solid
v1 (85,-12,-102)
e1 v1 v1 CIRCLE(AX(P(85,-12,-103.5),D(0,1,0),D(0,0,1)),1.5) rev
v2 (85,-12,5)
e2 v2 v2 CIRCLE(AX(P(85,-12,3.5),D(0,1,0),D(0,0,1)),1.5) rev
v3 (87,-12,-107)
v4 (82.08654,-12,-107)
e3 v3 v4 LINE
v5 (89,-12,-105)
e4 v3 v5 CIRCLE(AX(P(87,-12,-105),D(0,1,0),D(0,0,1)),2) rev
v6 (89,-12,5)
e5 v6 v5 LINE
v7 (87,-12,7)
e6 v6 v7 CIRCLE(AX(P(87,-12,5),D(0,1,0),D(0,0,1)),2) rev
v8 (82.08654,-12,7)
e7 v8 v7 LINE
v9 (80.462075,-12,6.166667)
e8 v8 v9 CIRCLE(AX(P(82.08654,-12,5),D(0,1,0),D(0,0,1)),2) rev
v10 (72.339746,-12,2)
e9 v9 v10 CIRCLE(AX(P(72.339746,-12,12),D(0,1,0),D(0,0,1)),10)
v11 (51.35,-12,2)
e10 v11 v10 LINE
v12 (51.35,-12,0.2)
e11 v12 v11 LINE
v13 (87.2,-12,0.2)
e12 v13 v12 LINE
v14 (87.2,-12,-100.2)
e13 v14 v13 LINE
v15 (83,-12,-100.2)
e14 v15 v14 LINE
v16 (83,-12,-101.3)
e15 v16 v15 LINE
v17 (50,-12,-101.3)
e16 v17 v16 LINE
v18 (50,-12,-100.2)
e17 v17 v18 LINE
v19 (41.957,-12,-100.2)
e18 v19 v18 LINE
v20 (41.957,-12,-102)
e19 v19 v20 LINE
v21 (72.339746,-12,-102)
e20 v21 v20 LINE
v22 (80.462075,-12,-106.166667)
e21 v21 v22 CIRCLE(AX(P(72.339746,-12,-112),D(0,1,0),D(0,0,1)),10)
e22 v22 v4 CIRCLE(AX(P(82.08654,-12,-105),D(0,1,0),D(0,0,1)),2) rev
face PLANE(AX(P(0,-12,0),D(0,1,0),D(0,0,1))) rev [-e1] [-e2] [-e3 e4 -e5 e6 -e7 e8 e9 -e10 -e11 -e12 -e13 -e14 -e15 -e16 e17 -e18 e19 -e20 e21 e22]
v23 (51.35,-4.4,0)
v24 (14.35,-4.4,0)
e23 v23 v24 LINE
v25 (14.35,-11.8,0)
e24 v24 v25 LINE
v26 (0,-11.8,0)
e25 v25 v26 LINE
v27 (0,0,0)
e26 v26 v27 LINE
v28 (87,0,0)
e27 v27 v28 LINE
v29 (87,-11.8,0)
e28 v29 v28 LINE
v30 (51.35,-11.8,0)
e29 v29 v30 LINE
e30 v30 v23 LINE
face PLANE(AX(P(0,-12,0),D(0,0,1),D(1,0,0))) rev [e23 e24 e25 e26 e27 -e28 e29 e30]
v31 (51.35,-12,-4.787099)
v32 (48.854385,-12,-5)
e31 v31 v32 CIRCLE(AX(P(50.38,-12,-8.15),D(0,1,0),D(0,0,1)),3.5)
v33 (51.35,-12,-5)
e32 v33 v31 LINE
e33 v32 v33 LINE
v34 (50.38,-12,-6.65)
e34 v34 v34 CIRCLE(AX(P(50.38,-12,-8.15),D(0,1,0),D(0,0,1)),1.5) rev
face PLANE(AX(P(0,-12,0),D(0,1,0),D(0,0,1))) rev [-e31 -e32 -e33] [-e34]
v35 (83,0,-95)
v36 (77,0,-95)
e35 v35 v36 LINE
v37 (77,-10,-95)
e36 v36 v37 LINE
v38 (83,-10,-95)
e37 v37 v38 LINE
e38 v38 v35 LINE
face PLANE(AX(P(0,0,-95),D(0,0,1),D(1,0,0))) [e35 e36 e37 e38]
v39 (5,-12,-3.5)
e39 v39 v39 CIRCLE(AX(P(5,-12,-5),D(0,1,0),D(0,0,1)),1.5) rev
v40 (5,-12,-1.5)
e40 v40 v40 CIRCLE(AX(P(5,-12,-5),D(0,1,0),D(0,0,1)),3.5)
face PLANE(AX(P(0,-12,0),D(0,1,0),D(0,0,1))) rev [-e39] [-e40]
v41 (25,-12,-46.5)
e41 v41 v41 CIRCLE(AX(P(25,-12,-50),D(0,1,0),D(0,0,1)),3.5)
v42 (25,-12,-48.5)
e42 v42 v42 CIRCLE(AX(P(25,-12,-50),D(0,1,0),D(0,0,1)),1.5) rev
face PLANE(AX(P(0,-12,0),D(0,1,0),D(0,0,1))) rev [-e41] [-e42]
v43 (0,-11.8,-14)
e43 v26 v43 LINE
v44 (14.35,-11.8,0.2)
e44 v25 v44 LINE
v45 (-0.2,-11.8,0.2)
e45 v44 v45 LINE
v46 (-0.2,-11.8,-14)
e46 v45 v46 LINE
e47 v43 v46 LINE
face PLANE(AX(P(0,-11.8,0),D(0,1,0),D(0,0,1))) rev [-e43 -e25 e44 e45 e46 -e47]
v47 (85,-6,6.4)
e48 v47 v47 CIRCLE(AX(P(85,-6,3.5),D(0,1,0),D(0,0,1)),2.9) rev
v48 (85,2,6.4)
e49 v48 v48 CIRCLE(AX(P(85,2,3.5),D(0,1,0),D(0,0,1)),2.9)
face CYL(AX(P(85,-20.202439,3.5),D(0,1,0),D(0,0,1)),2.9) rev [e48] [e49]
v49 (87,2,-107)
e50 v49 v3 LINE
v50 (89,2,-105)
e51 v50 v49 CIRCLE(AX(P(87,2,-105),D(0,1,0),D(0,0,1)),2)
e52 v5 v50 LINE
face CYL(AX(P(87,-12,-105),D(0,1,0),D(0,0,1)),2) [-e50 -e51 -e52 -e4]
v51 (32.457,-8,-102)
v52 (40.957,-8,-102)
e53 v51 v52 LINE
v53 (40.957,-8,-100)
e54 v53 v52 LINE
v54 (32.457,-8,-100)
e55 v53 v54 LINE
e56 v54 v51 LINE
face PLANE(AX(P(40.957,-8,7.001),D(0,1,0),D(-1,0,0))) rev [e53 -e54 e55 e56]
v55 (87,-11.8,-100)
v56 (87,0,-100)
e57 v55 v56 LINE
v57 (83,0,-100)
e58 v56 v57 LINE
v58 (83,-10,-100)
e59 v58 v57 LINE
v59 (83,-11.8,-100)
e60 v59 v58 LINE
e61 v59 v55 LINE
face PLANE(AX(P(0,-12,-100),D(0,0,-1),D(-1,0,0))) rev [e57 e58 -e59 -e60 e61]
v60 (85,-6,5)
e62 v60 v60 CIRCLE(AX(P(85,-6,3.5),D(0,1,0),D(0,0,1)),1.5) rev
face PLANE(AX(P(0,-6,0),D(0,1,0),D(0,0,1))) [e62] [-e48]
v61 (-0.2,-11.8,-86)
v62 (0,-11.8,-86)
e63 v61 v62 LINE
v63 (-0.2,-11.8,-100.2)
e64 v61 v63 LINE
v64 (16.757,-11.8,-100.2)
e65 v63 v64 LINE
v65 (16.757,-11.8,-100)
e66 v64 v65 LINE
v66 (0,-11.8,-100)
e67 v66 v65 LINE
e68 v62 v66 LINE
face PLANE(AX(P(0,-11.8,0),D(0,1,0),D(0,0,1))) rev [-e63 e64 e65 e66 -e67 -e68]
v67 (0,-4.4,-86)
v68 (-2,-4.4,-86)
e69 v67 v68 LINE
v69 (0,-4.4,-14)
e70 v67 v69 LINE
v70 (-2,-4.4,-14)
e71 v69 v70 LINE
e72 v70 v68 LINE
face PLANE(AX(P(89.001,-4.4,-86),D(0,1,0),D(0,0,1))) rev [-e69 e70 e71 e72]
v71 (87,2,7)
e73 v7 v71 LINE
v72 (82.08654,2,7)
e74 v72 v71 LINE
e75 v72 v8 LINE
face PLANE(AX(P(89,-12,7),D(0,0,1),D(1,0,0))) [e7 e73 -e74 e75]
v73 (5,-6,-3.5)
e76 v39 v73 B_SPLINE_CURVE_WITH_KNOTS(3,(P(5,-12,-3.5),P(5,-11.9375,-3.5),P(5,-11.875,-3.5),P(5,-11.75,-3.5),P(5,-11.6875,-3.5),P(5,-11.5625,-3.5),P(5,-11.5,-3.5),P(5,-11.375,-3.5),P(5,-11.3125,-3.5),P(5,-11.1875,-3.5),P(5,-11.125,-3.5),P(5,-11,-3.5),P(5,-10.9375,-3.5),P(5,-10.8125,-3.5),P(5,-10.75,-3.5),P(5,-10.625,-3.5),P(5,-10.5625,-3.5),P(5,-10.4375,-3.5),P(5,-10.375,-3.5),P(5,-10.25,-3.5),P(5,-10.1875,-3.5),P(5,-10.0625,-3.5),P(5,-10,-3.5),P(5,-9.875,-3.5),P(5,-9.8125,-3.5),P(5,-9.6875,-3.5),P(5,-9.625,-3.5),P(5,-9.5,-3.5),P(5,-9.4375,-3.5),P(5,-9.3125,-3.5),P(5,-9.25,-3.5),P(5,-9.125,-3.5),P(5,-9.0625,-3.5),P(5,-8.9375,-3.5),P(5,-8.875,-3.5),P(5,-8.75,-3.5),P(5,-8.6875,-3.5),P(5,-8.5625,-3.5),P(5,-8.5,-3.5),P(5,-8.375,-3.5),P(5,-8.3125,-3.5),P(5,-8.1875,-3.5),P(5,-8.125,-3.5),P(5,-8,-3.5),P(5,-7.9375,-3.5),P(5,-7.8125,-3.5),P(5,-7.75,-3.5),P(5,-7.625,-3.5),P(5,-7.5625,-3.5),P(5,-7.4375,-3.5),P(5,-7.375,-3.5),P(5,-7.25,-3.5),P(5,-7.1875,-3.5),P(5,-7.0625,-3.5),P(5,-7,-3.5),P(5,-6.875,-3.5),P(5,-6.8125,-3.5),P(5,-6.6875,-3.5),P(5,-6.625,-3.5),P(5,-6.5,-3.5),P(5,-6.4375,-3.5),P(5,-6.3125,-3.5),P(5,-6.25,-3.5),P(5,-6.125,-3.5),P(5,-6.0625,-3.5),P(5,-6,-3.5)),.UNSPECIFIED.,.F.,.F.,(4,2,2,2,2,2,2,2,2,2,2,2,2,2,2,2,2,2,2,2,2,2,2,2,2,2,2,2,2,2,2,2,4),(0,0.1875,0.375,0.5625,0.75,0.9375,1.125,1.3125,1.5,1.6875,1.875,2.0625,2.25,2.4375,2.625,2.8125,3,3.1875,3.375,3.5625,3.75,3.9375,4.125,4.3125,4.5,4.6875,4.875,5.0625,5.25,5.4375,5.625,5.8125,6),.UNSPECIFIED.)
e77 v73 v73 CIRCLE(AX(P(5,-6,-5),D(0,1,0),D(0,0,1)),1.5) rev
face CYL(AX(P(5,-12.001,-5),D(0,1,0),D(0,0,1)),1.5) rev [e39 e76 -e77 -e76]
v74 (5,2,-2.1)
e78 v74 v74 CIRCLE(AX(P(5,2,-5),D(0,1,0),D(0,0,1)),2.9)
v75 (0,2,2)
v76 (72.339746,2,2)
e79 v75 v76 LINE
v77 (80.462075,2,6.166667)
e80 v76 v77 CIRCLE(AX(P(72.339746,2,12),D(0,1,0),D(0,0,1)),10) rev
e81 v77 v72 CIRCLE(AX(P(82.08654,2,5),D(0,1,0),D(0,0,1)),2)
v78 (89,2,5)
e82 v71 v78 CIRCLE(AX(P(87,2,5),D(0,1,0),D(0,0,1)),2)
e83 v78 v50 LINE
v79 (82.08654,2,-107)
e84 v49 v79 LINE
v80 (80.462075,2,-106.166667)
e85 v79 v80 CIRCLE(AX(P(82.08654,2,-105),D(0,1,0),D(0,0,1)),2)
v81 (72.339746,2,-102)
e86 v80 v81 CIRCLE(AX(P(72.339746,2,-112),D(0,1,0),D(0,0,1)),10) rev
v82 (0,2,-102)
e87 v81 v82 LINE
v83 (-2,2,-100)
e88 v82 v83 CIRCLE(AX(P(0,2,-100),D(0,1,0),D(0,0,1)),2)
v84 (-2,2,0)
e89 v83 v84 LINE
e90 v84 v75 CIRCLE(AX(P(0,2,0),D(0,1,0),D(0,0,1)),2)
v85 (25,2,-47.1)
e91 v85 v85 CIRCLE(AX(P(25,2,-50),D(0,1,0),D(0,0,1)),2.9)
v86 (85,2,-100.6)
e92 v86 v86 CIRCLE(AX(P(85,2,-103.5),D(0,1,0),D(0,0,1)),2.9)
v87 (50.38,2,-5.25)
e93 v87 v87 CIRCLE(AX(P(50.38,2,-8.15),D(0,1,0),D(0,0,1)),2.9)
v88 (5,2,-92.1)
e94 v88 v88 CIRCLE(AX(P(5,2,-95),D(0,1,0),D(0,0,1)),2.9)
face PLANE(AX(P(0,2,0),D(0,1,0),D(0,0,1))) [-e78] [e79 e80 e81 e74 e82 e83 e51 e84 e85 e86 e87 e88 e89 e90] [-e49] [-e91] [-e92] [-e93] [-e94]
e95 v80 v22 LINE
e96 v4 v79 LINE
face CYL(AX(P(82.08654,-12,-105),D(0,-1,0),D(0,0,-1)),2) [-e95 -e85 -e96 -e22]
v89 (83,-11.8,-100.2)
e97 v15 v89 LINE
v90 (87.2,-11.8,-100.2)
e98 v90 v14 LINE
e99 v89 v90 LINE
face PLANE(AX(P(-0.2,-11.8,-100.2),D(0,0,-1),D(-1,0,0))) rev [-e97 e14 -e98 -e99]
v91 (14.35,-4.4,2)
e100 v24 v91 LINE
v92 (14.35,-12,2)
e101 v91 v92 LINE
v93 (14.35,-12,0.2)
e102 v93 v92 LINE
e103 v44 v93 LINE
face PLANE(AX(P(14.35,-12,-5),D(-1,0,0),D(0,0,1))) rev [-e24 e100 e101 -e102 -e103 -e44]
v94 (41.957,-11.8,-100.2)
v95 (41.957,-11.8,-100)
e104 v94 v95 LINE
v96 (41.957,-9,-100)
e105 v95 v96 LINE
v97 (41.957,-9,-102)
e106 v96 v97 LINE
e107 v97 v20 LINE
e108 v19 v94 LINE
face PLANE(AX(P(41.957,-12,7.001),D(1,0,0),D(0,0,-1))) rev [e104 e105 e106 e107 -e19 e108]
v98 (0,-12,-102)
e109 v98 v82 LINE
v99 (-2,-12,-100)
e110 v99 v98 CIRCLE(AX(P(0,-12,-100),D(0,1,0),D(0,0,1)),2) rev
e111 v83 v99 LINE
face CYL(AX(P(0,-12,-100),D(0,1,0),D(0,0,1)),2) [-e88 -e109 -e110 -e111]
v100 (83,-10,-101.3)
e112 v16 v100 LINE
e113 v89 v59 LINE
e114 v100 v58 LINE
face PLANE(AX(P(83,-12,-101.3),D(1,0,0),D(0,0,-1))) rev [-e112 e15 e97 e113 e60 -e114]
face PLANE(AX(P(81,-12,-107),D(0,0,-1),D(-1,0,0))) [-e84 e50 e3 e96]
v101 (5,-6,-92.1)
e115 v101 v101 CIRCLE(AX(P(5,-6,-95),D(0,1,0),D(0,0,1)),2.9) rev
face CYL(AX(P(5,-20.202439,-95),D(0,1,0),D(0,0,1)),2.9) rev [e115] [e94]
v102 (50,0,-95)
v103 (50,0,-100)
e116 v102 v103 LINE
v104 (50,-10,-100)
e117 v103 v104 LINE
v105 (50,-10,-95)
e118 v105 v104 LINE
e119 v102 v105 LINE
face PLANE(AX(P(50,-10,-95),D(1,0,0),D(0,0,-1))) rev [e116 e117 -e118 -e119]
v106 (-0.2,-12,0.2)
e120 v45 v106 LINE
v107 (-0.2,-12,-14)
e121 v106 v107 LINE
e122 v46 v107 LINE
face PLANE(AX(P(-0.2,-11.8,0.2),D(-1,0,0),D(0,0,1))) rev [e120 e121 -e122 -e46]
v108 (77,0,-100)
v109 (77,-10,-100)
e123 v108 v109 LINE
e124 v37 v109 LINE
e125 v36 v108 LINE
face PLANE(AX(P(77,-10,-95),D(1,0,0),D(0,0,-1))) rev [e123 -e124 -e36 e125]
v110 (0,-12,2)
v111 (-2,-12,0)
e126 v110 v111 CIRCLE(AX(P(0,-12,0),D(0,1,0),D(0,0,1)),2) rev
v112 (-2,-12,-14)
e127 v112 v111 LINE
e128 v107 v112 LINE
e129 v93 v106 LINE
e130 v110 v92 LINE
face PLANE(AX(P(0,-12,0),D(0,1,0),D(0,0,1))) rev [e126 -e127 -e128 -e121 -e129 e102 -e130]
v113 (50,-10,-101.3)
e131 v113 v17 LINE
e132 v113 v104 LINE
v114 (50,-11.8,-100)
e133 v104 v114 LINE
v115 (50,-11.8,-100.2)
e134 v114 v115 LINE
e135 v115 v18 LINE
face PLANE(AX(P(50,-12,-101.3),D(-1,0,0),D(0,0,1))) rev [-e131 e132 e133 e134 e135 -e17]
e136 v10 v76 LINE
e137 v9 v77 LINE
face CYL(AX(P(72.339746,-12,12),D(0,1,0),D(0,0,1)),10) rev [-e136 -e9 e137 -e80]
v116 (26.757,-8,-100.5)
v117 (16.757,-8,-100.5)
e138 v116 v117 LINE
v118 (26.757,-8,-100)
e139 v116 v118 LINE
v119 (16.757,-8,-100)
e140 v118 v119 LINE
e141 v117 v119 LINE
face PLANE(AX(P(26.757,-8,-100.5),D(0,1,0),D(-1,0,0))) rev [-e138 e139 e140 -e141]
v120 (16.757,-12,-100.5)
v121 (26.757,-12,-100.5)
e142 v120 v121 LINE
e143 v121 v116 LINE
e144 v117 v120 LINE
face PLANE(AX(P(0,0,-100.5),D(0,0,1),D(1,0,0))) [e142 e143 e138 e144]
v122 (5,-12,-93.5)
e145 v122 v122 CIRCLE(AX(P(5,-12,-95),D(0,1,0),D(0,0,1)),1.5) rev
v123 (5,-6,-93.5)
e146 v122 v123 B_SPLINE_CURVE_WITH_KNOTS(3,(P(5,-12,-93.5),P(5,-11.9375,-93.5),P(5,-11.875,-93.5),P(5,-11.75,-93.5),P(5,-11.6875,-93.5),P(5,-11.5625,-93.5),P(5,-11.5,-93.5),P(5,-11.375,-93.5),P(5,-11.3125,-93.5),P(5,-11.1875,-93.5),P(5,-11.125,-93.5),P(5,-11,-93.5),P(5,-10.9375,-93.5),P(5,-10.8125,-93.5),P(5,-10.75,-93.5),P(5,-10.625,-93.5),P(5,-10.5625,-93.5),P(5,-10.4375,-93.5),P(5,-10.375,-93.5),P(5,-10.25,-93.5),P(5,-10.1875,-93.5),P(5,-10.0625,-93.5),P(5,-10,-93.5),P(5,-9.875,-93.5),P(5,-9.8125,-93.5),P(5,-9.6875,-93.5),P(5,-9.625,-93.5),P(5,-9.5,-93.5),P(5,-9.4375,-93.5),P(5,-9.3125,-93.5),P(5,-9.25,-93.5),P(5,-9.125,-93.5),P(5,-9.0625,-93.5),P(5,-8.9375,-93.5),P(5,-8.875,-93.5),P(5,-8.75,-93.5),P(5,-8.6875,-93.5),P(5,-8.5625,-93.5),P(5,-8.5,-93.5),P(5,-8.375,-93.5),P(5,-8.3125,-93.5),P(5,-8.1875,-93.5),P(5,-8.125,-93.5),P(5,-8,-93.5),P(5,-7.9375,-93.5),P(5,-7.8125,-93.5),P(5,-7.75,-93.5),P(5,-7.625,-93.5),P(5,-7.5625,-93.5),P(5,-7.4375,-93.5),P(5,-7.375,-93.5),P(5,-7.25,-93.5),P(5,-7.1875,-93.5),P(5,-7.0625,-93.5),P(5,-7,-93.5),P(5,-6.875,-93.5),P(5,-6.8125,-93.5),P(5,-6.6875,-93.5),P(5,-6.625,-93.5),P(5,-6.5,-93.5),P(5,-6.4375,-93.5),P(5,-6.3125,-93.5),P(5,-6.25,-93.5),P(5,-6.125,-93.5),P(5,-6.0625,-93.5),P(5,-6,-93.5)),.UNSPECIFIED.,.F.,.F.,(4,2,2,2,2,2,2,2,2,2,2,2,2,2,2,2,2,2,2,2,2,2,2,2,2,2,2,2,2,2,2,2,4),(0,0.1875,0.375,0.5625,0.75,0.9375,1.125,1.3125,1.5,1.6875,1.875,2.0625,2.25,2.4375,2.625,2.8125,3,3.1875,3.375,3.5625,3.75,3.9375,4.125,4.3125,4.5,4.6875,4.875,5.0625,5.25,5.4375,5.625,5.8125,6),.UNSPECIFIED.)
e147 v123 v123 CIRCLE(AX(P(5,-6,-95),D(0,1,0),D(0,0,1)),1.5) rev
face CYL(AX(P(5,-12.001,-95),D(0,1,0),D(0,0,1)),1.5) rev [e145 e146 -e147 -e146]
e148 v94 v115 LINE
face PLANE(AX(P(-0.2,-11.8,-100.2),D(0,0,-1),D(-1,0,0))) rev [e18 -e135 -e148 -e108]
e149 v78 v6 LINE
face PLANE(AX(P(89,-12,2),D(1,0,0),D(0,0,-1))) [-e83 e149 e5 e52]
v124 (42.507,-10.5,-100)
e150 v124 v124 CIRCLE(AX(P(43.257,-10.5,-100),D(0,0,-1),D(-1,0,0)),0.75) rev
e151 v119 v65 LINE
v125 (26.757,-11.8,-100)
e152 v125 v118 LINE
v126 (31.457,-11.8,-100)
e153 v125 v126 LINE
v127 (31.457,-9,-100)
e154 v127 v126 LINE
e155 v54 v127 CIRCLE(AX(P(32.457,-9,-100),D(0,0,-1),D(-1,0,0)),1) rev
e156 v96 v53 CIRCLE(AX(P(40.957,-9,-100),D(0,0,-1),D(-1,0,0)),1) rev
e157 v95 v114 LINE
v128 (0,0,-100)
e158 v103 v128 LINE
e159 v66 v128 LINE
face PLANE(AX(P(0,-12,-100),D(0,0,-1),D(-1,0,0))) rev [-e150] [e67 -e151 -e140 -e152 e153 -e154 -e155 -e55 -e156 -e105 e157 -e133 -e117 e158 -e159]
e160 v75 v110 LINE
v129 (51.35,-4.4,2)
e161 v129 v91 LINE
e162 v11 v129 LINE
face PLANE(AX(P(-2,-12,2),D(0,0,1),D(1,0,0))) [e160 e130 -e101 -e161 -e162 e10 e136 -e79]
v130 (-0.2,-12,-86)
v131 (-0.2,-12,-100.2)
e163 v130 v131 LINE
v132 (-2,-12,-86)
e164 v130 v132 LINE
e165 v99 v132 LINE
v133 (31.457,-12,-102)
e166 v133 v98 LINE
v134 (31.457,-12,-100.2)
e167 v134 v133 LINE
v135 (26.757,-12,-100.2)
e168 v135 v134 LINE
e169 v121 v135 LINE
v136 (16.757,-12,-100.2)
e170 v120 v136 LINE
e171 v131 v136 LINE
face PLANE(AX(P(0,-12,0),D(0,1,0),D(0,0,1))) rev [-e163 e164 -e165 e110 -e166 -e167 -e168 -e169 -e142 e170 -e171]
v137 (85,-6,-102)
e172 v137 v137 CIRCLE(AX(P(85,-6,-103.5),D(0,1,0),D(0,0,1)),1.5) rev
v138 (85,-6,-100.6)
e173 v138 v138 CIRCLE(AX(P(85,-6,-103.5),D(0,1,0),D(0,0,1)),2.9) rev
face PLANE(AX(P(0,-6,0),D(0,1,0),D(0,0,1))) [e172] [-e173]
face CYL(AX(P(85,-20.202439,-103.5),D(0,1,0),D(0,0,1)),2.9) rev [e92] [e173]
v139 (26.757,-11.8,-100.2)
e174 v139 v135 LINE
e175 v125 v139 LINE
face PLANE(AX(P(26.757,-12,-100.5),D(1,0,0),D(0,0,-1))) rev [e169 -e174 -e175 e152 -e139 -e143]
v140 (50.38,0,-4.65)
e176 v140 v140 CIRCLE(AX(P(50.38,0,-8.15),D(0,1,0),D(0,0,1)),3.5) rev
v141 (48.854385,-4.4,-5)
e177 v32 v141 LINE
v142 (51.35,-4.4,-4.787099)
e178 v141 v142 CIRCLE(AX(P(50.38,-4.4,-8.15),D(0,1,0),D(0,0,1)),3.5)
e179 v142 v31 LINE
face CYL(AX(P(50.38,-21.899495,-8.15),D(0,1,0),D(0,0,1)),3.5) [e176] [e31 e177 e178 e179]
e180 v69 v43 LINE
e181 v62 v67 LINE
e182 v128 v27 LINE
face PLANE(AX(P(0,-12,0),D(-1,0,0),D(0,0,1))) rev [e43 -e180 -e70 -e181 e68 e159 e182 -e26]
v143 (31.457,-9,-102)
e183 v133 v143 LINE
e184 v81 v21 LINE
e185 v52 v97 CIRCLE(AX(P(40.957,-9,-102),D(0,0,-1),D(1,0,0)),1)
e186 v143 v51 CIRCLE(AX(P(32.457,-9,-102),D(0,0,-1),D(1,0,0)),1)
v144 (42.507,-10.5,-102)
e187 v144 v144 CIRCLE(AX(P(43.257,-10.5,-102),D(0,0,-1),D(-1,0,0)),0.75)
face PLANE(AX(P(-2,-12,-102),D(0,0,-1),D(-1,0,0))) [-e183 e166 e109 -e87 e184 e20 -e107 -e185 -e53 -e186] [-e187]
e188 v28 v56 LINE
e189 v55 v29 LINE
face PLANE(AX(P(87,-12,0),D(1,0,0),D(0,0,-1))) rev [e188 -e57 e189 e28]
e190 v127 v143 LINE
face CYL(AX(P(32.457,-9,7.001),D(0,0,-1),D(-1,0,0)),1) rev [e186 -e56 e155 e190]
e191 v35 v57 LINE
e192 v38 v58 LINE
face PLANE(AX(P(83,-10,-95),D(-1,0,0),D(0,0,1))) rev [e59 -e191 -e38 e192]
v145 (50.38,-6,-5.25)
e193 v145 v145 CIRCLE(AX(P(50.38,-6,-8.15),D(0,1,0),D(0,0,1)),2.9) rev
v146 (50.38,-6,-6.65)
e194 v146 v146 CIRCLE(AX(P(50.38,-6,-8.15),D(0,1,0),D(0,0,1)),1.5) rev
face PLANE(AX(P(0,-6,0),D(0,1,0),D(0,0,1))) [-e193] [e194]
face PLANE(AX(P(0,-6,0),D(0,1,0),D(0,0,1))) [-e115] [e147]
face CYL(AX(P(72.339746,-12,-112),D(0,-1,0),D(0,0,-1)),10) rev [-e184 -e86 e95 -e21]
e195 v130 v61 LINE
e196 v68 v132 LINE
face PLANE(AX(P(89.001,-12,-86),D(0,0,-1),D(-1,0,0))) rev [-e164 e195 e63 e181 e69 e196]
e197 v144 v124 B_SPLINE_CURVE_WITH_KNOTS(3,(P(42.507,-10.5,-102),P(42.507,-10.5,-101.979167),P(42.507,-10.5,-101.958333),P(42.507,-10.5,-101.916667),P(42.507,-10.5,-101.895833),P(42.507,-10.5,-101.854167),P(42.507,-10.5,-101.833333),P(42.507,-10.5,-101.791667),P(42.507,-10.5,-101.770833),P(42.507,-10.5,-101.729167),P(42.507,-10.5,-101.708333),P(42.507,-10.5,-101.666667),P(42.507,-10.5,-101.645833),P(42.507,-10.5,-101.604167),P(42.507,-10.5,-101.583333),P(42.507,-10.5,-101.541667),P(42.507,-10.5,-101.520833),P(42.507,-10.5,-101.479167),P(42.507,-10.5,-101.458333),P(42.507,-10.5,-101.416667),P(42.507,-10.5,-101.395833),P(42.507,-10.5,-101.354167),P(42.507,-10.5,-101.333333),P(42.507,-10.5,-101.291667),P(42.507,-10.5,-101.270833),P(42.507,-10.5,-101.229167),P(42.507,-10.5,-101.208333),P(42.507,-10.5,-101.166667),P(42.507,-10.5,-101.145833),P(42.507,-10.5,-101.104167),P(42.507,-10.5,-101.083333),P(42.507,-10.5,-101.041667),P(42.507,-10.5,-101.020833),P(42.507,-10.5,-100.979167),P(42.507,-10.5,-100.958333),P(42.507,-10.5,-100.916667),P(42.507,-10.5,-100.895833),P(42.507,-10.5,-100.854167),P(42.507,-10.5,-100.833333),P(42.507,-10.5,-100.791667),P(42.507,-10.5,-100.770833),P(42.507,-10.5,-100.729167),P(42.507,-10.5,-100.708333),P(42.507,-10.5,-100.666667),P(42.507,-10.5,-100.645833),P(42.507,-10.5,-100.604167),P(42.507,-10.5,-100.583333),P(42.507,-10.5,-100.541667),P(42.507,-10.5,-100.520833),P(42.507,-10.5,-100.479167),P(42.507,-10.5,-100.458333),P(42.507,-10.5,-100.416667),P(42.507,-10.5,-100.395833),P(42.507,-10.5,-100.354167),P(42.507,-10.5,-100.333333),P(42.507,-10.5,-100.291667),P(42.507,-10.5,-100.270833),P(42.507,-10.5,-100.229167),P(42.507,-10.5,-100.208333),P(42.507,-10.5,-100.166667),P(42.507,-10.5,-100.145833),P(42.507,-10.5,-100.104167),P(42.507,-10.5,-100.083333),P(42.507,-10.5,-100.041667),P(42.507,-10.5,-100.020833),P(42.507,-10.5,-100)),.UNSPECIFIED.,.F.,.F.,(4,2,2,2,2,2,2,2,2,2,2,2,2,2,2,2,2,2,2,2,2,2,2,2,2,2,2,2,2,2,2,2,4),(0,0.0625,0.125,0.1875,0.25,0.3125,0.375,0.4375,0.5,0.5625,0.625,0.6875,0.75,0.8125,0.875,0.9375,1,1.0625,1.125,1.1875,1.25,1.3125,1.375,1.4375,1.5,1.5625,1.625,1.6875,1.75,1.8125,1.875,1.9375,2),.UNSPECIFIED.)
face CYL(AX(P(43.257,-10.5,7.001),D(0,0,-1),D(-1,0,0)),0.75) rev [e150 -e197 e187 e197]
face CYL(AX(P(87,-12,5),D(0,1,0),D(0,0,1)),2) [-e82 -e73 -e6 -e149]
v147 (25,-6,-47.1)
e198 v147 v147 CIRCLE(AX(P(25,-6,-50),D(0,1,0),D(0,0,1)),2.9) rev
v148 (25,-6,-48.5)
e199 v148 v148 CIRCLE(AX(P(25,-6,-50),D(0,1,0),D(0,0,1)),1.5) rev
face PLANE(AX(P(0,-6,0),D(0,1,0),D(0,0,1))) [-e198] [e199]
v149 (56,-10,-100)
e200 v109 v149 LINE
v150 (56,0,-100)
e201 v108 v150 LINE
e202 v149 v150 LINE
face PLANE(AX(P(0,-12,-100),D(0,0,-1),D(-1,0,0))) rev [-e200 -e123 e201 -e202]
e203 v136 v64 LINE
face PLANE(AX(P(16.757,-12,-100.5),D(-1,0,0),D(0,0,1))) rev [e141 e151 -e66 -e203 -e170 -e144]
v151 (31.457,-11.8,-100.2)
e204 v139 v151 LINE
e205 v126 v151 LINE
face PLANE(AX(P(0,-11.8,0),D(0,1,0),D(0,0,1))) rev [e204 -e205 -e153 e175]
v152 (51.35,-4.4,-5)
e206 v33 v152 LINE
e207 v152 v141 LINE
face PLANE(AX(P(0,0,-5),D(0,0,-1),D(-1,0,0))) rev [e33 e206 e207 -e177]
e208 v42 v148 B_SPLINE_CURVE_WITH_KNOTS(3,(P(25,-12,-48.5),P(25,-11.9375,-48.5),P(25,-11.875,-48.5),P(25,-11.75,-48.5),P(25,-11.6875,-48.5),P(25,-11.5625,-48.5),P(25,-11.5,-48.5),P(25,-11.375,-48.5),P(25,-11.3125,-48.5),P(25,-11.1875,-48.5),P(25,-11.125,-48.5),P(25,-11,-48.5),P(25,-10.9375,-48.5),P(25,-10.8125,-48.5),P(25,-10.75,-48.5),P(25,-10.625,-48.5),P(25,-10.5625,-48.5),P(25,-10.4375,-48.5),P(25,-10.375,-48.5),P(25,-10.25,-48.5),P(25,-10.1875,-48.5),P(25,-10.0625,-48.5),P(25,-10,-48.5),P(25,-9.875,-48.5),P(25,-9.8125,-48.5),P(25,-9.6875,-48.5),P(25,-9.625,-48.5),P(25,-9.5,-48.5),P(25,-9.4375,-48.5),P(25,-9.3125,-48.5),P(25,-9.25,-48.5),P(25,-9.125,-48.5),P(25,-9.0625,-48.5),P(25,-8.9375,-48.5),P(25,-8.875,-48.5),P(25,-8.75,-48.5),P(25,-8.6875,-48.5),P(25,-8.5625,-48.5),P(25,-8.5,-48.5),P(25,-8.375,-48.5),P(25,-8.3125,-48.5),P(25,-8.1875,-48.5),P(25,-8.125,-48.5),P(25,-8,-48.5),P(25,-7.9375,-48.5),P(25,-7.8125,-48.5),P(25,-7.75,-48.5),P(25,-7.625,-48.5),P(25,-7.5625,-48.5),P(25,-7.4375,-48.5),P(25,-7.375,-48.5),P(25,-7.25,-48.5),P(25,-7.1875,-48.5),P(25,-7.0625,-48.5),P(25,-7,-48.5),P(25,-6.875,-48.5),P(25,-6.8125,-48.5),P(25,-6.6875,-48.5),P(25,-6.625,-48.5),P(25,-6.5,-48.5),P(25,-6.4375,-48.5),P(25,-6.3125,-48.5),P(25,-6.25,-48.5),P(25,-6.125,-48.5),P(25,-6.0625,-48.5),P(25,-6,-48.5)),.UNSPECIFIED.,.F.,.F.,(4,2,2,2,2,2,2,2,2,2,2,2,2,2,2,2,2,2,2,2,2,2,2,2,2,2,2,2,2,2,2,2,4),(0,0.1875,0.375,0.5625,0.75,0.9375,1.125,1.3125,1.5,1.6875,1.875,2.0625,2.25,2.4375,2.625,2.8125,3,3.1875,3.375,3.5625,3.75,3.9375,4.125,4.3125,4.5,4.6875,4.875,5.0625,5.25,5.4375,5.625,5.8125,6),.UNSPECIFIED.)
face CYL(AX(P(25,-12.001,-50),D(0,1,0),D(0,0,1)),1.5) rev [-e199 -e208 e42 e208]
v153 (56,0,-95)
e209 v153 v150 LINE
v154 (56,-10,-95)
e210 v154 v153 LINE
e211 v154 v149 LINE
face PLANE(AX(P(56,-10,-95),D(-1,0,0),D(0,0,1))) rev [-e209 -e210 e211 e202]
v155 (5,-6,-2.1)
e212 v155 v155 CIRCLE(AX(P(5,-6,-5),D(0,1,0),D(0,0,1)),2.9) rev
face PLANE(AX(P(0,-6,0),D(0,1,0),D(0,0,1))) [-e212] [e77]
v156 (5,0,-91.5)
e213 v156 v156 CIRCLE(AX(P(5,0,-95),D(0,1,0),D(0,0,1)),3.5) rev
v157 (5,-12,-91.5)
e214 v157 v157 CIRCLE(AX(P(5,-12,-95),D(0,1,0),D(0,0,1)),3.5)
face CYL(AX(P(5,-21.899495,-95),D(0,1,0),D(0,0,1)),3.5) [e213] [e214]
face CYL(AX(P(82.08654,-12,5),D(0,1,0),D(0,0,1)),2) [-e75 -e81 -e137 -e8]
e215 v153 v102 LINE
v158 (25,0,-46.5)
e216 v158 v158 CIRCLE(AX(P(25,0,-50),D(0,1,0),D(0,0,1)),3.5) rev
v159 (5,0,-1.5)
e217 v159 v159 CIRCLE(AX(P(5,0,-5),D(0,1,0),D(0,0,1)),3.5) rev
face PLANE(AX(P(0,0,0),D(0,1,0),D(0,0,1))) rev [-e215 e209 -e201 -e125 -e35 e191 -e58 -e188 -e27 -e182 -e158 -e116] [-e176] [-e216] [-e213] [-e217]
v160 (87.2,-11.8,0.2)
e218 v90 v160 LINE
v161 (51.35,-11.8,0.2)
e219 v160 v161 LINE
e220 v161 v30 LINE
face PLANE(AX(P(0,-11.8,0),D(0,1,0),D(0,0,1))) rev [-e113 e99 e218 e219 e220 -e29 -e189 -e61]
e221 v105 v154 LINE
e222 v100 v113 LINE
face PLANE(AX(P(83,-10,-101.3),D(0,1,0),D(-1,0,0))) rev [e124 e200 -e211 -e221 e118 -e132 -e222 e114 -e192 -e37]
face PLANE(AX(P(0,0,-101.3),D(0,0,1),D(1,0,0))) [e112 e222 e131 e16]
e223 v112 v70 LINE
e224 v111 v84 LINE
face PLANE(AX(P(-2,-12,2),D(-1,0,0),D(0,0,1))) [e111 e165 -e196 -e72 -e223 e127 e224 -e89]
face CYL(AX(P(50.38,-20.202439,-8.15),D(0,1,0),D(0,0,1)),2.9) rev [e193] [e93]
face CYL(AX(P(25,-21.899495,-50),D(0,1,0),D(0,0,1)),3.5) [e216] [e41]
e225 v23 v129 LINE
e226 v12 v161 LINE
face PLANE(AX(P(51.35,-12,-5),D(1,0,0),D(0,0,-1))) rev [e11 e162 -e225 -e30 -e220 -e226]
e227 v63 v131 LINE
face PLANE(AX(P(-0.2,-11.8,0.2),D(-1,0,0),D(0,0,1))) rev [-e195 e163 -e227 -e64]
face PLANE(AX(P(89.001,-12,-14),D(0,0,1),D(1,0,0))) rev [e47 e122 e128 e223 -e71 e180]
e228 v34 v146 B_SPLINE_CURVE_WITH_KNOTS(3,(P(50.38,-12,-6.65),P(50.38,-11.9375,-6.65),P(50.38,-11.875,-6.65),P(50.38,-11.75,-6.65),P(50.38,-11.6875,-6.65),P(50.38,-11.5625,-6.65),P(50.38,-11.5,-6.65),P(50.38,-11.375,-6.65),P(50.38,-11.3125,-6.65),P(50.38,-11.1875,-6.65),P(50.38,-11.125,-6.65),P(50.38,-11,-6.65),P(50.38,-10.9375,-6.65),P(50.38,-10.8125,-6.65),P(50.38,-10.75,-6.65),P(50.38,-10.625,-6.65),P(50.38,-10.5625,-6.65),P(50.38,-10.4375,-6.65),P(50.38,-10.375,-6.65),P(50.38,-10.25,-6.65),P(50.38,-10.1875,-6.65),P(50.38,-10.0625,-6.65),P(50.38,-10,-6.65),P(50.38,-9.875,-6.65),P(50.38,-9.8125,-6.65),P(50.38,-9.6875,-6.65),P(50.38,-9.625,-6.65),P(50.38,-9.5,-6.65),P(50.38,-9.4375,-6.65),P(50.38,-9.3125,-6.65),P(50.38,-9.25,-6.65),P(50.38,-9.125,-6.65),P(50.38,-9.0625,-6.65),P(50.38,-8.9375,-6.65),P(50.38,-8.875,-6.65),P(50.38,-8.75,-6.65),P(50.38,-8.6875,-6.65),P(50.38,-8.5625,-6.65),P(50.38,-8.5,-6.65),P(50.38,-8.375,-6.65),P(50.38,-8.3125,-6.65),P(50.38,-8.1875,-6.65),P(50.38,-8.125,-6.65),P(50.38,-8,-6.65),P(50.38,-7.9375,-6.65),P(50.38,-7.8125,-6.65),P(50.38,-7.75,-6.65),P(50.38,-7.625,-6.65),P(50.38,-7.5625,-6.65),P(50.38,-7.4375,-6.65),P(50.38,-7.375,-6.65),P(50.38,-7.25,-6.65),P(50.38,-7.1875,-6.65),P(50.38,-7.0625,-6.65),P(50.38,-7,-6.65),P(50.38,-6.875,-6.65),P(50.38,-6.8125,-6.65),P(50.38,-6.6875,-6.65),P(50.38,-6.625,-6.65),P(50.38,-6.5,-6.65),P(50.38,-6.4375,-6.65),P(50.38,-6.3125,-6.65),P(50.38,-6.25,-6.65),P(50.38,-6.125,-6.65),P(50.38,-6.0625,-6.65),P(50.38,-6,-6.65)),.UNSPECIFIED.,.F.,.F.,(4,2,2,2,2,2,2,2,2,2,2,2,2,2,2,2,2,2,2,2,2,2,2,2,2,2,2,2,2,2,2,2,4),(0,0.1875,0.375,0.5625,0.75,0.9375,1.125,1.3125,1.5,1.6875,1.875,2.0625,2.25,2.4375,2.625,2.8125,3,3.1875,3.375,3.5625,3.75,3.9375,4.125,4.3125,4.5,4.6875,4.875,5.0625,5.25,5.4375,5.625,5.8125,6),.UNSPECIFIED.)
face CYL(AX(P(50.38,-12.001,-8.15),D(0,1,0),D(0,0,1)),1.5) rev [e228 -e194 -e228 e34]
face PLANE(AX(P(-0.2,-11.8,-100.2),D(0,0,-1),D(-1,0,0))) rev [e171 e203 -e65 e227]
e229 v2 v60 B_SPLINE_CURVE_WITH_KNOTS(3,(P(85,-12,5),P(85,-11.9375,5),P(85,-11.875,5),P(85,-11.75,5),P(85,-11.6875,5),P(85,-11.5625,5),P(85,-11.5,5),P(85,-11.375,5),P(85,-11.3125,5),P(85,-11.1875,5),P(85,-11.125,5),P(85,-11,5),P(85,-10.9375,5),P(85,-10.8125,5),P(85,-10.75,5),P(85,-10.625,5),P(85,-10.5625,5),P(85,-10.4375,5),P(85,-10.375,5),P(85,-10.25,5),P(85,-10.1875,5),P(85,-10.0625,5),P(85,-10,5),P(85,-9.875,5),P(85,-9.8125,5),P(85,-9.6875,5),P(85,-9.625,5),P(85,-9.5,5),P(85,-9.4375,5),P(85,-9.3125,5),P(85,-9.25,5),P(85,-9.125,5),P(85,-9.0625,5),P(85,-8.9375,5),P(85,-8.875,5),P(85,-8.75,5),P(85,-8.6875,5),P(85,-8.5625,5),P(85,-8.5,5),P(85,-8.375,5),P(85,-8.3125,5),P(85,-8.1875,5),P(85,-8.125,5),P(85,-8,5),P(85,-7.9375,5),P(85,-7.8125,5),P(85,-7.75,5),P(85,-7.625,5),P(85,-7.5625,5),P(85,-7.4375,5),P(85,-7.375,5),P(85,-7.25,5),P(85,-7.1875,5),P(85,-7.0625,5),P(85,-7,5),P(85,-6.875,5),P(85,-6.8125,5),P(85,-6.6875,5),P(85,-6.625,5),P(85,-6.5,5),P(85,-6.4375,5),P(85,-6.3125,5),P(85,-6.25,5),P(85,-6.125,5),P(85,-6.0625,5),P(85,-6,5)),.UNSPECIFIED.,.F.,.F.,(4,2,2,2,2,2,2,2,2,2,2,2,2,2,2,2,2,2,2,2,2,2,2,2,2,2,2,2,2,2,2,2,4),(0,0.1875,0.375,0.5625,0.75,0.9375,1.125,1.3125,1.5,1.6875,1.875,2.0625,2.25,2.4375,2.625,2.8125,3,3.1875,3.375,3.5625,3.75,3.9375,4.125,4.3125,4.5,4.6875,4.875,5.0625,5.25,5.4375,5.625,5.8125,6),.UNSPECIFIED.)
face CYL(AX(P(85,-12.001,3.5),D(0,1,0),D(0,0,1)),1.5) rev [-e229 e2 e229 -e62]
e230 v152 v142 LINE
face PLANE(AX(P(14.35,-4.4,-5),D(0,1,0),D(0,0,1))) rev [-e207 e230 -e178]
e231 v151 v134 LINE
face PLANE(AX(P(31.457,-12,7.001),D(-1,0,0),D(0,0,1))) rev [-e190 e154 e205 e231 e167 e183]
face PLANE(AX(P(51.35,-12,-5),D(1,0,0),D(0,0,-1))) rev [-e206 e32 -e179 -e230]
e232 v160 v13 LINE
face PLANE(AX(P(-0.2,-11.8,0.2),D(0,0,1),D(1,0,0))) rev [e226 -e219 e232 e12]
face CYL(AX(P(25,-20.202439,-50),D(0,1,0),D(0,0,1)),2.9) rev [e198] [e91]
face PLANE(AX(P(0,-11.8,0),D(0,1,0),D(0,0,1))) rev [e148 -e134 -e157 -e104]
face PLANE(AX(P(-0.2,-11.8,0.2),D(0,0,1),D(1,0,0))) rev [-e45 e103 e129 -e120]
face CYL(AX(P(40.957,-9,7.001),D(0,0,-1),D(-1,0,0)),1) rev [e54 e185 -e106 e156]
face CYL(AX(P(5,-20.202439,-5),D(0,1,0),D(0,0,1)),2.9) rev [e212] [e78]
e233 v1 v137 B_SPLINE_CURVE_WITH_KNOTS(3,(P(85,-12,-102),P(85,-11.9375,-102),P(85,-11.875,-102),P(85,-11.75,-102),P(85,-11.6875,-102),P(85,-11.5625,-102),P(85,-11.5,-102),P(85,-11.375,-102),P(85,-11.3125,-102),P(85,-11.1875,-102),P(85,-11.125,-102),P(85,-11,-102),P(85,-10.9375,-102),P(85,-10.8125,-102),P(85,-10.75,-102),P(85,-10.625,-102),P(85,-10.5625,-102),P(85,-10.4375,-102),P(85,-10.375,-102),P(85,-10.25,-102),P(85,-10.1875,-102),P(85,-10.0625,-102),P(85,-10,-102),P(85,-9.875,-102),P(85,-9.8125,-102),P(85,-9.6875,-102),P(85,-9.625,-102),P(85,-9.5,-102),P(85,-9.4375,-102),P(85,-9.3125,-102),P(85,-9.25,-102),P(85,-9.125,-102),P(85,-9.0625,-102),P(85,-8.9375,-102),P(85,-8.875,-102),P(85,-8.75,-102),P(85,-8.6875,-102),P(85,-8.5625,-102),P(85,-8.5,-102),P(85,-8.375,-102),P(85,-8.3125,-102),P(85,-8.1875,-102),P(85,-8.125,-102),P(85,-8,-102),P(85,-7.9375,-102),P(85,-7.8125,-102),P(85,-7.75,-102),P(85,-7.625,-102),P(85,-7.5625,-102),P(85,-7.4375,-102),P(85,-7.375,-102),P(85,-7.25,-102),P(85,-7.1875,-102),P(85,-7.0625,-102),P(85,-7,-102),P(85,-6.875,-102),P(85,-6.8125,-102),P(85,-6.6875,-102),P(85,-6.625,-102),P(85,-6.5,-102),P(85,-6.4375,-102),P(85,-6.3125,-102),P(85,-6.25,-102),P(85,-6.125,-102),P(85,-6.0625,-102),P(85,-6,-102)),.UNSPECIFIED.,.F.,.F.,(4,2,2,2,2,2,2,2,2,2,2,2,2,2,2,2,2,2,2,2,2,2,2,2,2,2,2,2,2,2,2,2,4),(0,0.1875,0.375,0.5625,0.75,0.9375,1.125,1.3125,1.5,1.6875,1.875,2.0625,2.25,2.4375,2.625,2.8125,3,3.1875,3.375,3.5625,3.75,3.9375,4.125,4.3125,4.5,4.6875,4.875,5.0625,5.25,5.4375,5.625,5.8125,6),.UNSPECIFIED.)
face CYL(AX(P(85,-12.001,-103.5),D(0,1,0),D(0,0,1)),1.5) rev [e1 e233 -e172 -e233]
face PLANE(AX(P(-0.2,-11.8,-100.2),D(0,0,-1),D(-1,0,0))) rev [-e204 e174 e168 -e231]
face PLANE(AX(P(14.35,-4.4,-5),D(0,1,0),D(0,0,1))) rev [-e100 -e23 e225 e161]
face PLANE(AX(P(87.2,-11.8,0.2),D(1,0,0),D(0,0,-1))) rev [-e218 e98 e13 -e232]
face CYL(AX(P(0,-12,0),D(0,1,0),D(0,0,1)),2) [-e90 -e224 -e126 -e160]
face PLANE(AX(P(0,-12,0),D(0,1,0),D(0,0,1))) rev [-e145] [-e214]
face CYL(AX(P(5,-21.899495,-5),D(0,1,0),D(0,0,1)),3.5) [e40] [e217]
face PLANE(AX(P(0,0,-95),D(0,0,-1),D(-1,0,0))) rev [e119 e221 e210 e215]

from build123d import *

# Parameters (mm, degrees)
SKETCH1_W           = 91
SKETCH1_H           = 104
SKETCH1_W_2         = 87
SKETCH1_H_2         = 100
BOSS_EXTRUDE1_DEPTH = 12
SKETCH2_W           = 91
SKETCH2_H           = 104
BOSS_EXTRUDE2_DEPTH = 2
SKETCH3_R           = 3.5
BOSS_EXTRUDE3_DEPTH = 12
SKETCH6_W           = 8
SKETCH6_H           = 5
BOSS_EXTRUDE4_DEPTH = 14
CUT_EXTRUDE1_REACH  = 141.879
SKETCH4_R           = 1.5
SKETCH7_R           = 2.9
CUT_EXTRUDE2_DEPTH  = 8
SKETCH8_W           = 33
SKETCH8_H           = 2
CUT_EXTRUDE3_DEPTH  = 1.3
SKETCH9_W           = 87.4
SKETCH9_H           = 100.4
SKETCH9_W_2         = 87
SKETCH9_H_2         = 100
CUT_EXTRUDE4_DEPTH  = 0.2
SKETCH10_W          = 6
SKETCH10_H          = 10
BOSS_EXTRUDE7_DEPTH = 5
CUT_EXTRUDE5_REACH  = 143.23
SKETCH11_R          = 0.75
SKETCH12_W          = 37
SKETCH12_H          = 7.6
CUT_EXTRUDE6_DEPTH  = 7
CUT_EXTRUDE7_REACH  = 142.975
SKETCH13_W          = 72
SKETCH13_H          = 7.6
FILLET1_R           = 10
FILLET2_R           = 2
SKETCH14_W          = 10
SKETCH14_H          = 4
CUT_EXTRUDE8_DEPTH  = 0.5


with BuildPart() as part:
    # Sketch1 → Boss-Extrude1 (new body)
    with BuildSketch(Plane(origin=(0, 0, 0), x_dir=(1, 0, 0), z_dir=(0, 1, 0))):
        with Locations((43.5, 50)):
            Rectangle(SKETCH1_W, SKETCH1_H)
        with Locations((43.5, 50)):
            Rectangle(SKETCH1_W_2, SKETCH1_H_2, mode=Mode.SUBTRACT)
    extrude(amount=-BOSS_EXTRUDE1_DEPTH)

    # Sketch2 → Boss-Extrude2 (add)
    with BuildSketch(Plane(origin=(0, 0, 0), x_dir=(1, 0, 0), z_dir=(0, 1, 0))):
        with Locations((43.5, 50)):
            Rectangle(SKETCH2_W, SKETCH2_H)
    extrude(amount=BOSS_EXTRUDE2_DEPTH)

    # Sketch3 → Boss-Extrude3 (add)
    with BuildSketch(Plane.XZ):
        with Locations(Location((5, -5, 0), (0, 0, 90))):
            Circle(SKETCH3_R)
        with Locations(Location((5, -95, 0), (0, 0, 90))):
            Circle(SKETCH3_R)
        with Locations(Location((50.38, -8.15, 0), (0, 0, 90))):
            Circle(SKETCH3_R)
        with Locations(Location((25, -50, 0), (0, 0, 90))):
            Circle(SKETCH3_R)
    extrude(amount=BOSS_EXTRUDE3_DEPTH)

    # Sketch6 → Boss-Extrude4 (add, through all)
    with BuildSketch(Plane(origin=(0, 2, 0), x_dir=(1, 0, 0), z_dir=(0, 1, 0))):
        with Locations((85, 104.5)):
            Rectangle(SKETCH6_W, SKETCH6_H)
        with Locations((85, -4.5)):
            Rectangle(SKETCH6_W, SKETCH6_H)
    extrude(amount=-BOSS_EXTRUDE4_DEPTH)

    # Sketch4 → Cut-Extrude1 (cut, up to next)
    with BuildSketch(Plane(origin=(0, 2, 0), x_dir=(1, 0, 0), z_dir=(0, 1, 0)), mode=Mode.PRIVATE) as cut_extrude1_sk1:
        with Locations(Location((5, 5, 0), (0, 0, 270))):
            Circle(SKETCH4_R)
    cut_extrude1_tool1 = extrude(cut_extrude1_sk1.sketch, amount=-CUT_EXTRUDE1_REACH, mode=Mode.PRIVATE) & part.part
    # Sketch4 → Cut-Extrude1 (cut, up to next)
    with BuildSketch(Plane(origin=(0, 2, 0), x_dir=(1, 0, 0), z_dir=(0, 1, 0)), mode=Mode.PRIVATE) as cut_extrude1_sk2:
        with Locations(Location((5, 95, 0), (0, 0, 270))):
            Circle(SKETCH4_R)
    cut_extrude1_tool2 = extrude(cut_extrude1_sk2.sketch, amount=-CUT_EXTRUDE1_REACH, mode=Mode.PRIVATE) & part.part
    # Sketch4 → Cut-Extrude1 (cut, up to next)
    with BuildSketch(Plane(origin=(0, 2, 0), x_dir=(1, 0, 0), z_dir=(0, 1, 0)), mode=Mode.PRIVATE) as cut_extrude1_sk3:
        with Locations(Location((50.38, 8.15, 0), (0, 0, 270))):
            Circle(SKETCH4_R)
    cut_extrude1_tool3 = extrude(cut_extrude1_sk3.sketch, amount=-CUT_EXTRUDE1_REACH, mode=Mode.PRIVATE) & part.part
    # Sketch4 → Cut-Extrude1 (cut, up to next)
    with BuildSketch(Plane(origin=(0, 2, 0), x_dir=(1, 0, 0), z_dir=(0, 1, 0)), mode=Mode.PRIVATE) as cut_extrude1_sk4:
        with Locations(Location((25, 50, 0), (0, 0, 270))):
            Circle(SKETCH4_R)
    cut_extrude1_tool4 = extrude(cut_extrude1_sk4.sketch, amount=-CUT_EXTRUDE1_REACH, mode=Mode.PRIVATE) & part.part
    # Sketch4 → Cut-Extrude1 (cut, up to next)
    with BuildSketch(Plane(origin=(0, 2, 0), x_dir=(1, 0, 0), z_dir=(0, 1, 0)), mode=Mode.PRIVATE) as cut_extrude1_sk5:
        with Locations(Location((85, 103.5, 0), (0, 0, 270))):
            Circle(SKETCH4_R)
    cut_extrude1_tool5 = extrude(cut_extrude1_sk5.sketch, amount=-CUT_EXTRUDE1_REACH, mode=Mode.PRIVATE) & part.part
    # Sketch4 → Cut-Extrude1 (cut, up to next)
    with BuildSketch(Plane(origin=(0, 2, 0), x_dir=(1, 0, 0), z_dir=(0, 1, 0)), mode=Mode.PRIVATE) as cut_extrude1_sk6:
        with Locations(Location((85, -3.5, 0), (0, 0, 270))):
            Circle(SKETCH4_R)
    cut_extrude1_tool6 = extrude(cut_extrude1_sk6.sketch, amount=-CUT_EXTRUDE1_REACH, mode=Mode.PRIVATE) & part.part
    add(cut_extrude1_tool1.solids().sort_by_distance((5, 2, -5))[0], mode=Mode.SUBTRACT)
    add(cut_extrude1_tool2.solids().sort_by_distance((5, 2, -95))[0], mode=Mode.SUBTRACT)
    add(cut_extrude1_tool3.solids().sort_by_distance((50.38, 2, -8.15))[0], mode=Mode.SUBTRACT)
    add(cut_extrude1_tool4.solids().sort_by_distance((25, 2, -50))[0], mode=Mode.SUBTRACT)
    add(cut_extrude1_tool5.solids().sort_by_distance((85, 2, -103.5))[0], mode=Mode.SUBTRACT)
    add(cut_extrude1_tool6.solids().sort_by_distance((85, 2, 3.5))[0], mode=Mode.SUBTRACT)

    # Sketch7 → Cut-Extrude2 (cut)
    with BuildSketch(Plane(origin=(0, 2, 0), x_dir=(1, 0, 0), z_dir=(0, 1, 0))):
        with Locations(Location((5, 5, 0), (0, 0, 270))):
            Circle(SKETCH7_R)
        with Locations(Location((25, 50, 0), (0, 0, 270))):
            Circle(SKETCH7_R)
        with Locations(Location((50.38, 8.15, 0), (0, 0, 270))):
            Circle(SKETCH7_R)
        with Locations(Location((5, 95, 0), (0, 0, 270))):
            Circle(SKETCH7_R)
        with Locations(Location((85, 103.5, 0), (0, 0, 270))):
            Circle(SKETCH7_R)
        with Locations(Location((85, -3.5, 0), (0, 0, 270))):
            Circle(SKETCH7_R)
    extrude(amount=-CUT_EXTRUDE2_DEPTH, mode=Mode.SUBTRACT)

    # Sketch8 → Cut-Extrude3 (cut)
    with BuildSketch(Plane.XY.offset(-100)):
        with Locations((66.5, -11)):
            Rectangle(SKETCH8_W, SKETCH8_H)
    extrude(amount=-CUT_EXTRUDE3_DEPTH, mode=Mode.SUBTRACT)

    # Sketch9 → Cut-Extrude4 (cut)
    with BuildSketch(Plane(origin=(0, -12, 0), x_dir=(-1, 0, 0), z_dir=(0, -1, 0))):
        with Locations((-43.5, 50)):
            Rectangle(SKETCH9_W, SKETCH9_H)
        with Locations((-43.5, 50)):
            Rectangle(SKETCH9_W_2, SKETCH9_H_2, mode=Mode.SUBTRACT)
    extrude(amount=-CUT_EXTRUDE4_DEPTH, mode=Mode.SUBTRACT)

    # Sketch10 → Boss-Extrude7 (add)
    with BuildSketch(Plane.XY.offset(-100)):
        with Locations((53, -5)):
            Rectangle(SKETCH10_W, SKETCH10_H)
        with Locations((80, -5)):
            Rectangle(SKETCH10_W, SKETCH10_H)
    extrude(amount=BOSS_EXTRUDE7_DEPTH)

    # Sketch11 → Cut-Extrude5 (cut, up to next)
    with BuildSketch(Plane(origin=(0, 0, -102), x_dir=(-1, 0, 0), z_dir=(0, 0, -1)), mode=Mode.PRIVATE) as cut_extrude5_sk1:
        with Locations((-43.257, -10.5)):
            Circle(SKETCH11_R)
    cut_extrude5_tool1 = extrude(cut_extrude5_sk1.sketch, amount=-CUT_EXTRUDE5_REACH, mode=Mode.PRIVATE) & part.part
    # Sketch11 → Cut-Extrude5 (cut, up to next)
    with BuildSketch(Plane(origin=(0, 0, -102), x_dir=(-1, 0, 0), z_dir=(0, 0, -1)), mode=Mode.PRIVATE) as cut_extrude5_sk2:
        with BuildLine():
            Line((-41.957, -12), (-31.457, -12))
            Line((-31.457, -12), (-31.457, -9))
            ThreePointArc((-31.457, -9), (-31.749893219, -8.292893219), (-32.457, -8))
            Line((-32.457, -8), (-40.957, -8))
            ThreePointArc((-40.957, -8), (-41.664106781, -8.292893219), (-41.957, -9))
            Line((-41.957, -9), (-41.957, -12))
        make_face()
    cut_extrude5_tool2 = extrude(cut_extrude5_sk2.sketch, amount=-CUT_EXTRUDE5_REACH, mode=Mode.PRIVATE) & part.part
    add(cut_extrude5_tool1.solids().sort_by_distance((43.257, -10.5, -102))[0], mode=Mode.SUBTRACT)
    add(cut_extrude5_tool2.solids().sort_by_distance((36.707, -10.018343, -102))[0], mode=Mode.SUBTRACT)

    # Sketch12 → Cut-Extrude6 (cut)
    with BuildSketch(Plane.XY.offset(2)):
        with Locations((32.85, -8.2)):
            Rectangle(SKETCH12_W, SKETCH12_H)
    extrude(amount=-CUT_EXTRUDE6_DEPTH, mode=Mode.SUBTRACT)

    # Sketch13 → Cut-Extrude7 (cut, up to next)
    with BuildSketch(Plane.ZY.offset(2), mode=Mode.PRIVATE) as cut_extrude7_sk1:
        with Locations((-50, -8.2)):
            Rectangle(SKETCH13_W, SKETCH13_H)
    cut_extrude7_tool1 = extrude(cut_extrude7_sk1.sketch, amount=-CUT_EXTRUDE7_REACH, mode=Mode.PRIVATE) & part.part
    add(cut_extrude7_tool1.solids().sort_by_distance((-2, -8.2, -50))[0], mode=Mode.SUBTRACT)

    # Fillet1
    # the kernel refuses this fillet: 10 mm, written as the material it adds along each edge
    with BuildSketch(Plane(origin=(81, 2, -102), x_dir=(0, 0, -1), z_dir=(0, -1, 0))) as fillet1_piece_1:
        with BuildLine():
            CenterArc((10, -8.660254038), FILLET1_R, 120, 60)
            Line((0, -8.660254038), (-0.2, -8.660254038))
            Line((-0.2, -8.660254038), (-0.2, 0))
            Line((-0.2, 0), (0, 0.2))
            ThreePointArc((0, 0.2), (2.5, 0.2), (4.9, 0.173205081))
            Line((4.9, 0.173205081), (5, 0))
        make_face()
    extrude(amount=14)
    with BuildSketch(Plane(origin=(81, 2, 2), x_dir=(-1, 0, 0), z_dir=(0, -1, 0))) as fillet1_piece_2:
        with BuildLine():
            CenterArc((8.660254038, -10), FILLET1_R, 90, 60)
            Line((0, -5), (-0.173205081, -4.9))
            ThreePointArc((-0.173205081, -4.9), (-0.2, -2.5), (-0.2, 0))
            Line((-0.2, 0), (0, 0.2))
            Line((0, 0.2), (8.660254038, 0.2))
            Line((8.660254038, 0.2), (8.660254038, 0))
        make_face()
    extrude(amount=14)

    # Fillet2
    fillet2_edges = [part.edges().sort_by_distance(p)[0] for p in [
        (81, -5, -107),
        (89, -5, -107),
        (89, -5, 7),
        (81, -5, 7),
        (-2, -5, 2),
        (-2, -5, -102),
    ]]
    fillet(fillet2_edges, radius=FILLET2_R)

    # Sketch14 → Cut-Extrude8 (cut)
    with BuildSketch(Plane.XY.offset(-100)):
        with Locations((21.757, -10)):
            Rectangle(SKETCH14_W, SKETCH14_H)
    extrude(amount=-CUT_EXTRUDE8_DEPTH, mode=Mode.SUBTRACT)


solid = part.part
